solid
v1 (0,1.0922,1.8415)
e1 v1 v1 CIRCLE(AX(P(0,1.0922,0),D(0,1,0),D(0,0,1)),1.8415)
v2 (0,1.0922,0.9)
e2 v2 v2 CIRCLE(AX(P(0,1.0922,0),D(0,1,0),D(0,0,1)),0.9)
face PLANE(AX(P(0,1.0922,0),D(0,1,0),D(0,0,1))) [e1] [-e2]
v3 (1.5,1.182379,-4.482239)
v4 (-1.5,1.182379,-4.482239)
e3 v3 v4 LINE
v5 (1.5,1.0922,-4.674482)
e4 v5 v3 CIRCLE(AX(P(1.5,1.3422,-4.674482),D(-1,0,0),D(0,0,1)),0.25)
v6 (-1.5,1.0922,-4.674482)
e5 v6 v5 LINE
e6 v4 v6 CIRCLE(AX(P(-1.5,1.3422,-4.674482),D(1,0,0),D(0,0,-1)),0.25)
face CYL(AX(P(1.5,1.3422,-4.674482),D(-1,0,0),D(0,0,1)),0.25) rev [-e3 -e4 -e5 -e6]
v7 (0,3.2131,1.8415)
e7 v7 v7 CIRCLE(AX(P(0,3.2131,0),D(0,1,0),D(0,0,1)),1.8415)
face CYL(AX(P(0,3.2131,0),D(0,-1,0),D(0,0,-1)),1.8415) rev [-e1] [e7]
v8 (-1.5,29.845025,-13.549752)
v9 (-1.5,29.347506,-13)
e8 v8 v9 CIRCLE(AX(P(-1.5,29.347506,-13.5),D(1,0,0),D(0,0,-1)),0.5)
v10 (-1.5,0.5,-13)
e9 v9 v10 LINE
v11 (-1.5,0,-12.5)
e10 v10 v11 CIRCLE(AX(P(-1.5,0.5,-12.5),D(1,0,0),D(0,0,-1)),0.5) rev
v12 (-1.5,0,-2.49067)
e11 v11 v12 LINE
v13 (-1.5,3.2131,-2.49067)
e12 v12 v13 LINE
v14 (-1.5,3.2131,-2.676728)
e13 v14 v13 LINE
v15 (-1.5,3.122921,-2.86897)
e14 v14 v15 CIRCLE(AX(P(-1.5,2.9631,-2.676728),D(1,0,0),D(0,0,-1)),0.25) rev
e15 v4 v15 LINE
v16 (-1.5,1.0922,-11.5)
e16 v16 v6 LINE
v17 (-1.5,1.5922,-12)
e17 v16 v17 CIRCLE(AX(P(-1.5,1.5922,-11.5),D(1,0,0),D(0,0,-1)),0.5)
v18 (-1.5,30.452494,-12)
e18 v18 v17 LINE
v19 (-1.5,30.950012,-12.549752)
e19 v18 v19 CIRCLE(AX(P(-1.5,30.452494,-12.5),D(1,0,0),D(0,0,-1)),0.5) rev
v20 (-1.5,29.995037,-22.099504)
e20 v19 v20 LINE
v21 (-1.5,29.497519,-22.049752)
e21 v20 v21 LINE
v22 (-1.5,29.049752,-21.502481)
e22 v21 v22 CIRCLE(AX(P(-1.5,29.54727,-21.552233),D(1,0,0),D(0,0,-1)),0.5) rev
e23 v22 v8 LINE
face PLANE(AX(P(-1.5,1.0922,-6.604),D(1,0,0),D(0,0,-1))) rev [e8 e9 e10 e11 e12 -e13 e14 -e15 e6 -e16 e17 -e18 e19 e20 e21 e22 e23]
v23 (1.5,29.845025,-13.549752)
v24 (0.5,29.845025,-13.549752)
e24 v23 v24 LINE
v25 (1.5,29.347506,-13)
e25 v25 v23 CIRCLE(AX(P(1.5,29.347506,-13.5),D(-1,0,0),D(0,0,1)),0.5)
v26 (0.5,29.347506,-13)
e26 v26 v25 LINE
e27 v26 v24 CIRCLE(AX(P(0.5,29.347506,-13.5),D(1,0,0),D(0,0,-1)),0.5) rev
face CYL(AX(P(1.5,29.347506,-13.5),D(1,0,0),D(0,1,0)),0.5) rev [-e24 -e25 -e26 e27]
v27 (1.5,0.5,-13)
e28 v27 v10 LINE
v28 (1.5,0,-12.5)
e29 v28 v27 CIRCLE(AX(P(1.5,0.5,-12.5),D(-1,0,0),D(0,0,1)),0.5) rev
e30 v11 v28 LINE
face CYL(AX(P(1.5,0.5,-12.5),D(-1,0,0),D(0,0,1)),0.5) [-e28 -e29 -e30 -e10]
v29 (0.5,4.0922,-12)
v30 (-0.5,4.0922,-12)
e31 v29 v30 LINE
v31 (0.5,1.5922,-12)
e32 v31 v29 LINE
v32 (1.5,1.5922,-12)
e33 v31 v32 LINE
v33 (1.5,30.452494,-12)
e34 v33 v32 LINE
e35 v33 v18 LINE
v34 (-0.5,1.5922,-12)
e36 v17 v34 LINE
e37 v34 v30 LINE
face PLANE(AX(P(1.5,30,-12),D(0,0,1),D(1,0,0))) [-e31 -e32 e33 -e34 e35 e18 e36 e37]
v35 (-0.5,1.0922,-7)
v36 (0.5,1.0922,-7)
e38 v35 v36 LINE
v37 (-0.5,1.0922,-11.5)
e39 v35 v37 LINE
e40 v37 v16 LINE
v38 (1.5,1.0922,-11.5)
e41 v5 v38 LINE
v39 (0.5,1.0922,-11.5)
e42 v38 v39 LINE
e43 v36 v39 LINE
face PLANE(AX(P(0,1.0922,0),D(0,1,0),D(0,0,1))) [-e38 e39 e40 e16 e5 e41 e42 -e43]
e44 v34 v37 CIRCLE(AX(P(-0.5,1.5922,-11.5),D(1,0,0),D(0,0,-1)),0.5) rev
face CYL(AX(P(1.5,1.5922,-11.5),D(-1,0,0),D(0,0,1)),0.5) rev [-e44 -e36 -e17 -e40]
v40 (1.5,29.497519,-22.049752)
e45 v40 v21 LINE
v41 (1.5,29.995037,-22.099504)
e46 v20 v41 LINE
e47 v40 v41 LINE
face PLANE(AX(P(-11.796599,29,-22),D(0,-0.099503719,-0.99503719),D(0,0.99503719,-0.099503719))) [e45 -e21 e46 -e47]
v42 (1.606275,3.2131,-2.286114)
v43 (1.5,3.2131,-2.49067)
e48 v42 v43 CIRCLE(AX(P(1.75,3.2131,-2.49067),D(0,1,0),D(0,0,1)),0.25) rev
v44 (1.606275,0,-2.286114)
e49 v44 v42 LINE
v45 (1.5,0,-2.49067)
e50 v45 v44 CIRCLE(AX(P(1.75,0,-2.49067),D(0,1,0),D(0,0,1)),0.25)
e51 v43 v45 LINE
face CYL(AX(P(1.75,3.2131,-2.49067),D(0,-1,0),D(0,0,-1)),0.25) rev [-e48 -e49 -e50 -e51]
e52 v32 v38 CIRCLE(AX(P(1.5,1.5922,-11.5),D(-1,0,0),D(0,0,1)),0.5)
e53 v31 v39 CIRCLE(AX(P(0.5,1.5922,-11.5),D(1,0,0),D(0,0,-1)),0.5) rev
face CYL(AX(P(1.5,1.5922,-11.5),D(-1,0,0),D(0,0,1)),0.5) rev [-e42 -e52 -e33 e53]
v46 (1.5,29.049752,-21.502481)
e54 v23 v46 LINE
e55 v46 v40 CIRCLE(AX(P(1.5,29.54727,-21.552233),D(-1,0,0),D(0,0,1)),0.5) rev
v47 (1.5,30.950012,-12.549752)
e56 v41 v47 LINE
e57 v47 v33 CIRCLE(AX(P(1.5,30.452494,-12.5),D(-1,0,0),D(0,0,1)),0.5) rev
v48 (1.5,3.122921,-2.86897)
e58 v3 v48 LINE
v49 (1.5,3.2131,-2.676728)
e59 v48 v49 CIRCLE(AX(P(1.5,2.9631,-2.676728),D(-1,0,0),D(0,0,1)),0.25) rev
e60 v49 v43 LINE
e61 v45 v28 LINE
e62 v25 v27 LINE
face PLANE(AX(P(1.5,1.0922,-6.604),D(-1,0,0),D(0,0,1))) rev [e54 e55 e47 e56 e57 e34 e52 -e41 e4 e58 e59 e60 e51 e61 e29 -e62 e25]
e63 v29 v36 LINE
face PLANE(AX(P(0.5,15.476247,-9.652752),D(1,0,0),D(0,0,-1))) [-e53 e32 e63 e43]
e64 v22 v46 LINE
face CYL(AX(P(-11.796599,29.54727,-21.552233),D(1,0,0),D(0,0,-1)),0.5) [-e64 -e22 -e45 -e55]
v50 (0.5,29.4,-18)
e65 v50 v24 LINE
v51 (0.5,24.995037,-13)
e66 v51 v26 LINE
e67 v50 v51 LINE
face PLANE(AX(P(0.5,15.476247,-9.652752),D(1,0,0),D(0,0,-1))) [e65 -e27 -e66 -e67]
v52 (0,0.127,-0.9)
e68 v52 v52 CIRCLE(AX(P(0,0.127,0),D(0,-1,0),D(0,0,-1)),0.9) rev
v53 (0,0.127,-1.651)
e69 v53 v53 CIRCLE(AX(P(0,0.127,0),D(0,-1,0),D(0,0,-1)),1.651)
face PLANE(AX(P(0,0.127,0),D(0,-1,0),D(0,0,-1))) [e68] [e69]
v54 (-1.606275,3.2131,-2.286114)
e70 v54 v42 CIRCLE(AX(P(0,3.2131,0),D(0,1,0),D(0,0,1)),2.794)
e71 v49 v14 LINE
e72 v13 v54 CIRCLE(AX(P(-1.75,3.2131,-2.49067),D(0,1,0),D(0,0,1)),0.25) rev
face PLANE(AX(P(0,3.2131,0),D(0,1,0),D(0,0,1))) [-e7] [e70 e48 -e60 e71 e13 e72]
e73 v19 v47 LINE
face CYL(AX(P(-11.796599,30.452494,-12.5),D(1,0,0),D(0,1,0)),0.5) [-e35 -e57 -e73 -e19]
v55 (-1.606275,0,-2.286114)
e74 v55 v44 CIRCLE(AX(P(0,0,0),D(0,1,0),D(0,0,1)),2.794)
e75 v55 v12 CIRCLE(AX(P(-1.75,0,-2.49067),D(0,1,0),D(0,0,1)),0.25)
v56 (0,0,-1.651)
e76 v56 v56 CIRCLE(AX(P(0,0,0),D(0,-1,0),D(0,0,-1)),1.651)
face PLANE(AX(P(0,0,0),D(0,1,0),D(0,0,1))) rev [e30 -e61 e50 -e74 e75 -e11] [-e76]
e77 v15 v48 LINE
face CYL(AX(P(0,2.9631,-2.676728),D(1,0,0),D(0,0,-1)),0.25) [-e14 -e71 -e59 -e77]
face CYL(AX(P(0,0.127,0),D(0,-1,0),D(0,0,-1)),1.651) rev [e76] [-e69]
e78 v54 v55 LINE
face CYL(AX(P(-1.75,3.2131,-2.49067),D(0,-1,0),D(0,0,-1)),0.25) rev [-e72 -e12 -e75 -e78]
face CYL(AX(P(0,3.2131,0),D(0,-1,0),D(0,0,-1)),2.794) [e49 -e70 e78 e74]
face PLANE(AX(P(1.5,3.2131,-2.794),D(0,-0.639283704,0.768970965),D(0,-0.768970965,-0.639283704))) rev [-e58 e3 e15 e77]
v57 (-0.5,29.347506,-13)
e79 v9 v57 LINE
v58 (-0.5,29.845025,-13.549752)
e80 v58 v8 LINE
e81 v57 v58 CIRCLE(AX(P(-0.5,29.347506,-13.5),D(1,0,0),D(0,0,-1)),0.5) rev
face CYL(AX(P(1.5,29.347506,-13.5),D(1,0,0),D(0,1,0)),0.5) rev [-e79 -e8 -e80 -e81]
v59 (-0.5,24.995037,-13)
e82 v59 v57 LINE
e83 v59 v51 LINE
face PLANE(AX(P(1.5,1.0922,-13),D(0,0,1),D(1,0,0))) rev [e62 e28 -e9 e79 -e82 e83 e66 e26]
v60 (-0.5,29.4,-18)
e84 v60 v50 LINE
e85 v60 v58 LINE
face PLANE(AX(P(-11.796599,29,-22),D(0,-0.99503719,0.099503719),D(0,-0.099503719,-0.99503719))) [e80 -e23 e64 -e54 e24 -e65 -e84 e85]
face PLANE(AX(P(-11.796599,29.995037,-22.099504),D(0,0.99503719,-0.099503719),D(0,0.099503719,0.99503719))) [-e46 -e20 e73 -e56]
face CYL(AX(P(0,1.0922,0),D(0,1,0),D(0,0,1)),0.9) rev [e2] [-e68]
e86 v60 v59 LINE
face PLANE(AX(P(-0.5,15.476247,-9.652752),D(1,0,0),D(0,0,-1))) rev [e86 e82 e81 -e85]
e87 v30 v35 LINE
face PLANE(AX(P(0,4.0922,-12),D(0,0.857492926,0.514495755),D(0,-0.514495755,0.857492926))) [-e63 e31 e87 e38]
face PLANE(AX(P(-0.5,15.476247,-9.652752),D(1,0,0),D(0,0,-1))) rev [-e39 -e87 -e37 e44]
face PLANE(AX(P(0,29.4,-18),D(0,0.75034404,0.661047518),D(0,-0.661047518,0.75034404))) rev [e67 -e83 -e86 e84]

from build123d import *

# Parameters (mm, degrees)
SKETCH1_R                  = 2.794
SKETCH1_R_2                = 1.8415
BOSS_EXTRUDE1_DEPTH        = 3.2131
BOSS_EXTRUDE2_DEPTH        = 1.0922
M1_6_CLEARANCE_HOLE1_D     = 1.8
M1_6_CLEARANCE_HOLE1_DEPTH = 7.25
M1_6_CLEARANCE_HOLE1_TIP   = 0.540774557
SKETCH4_R                  = 1.651
CUT_EXTRUDE2_DEPTH         = 0.127
SKETCH5_W                  = 3
SKETCH5_H                  = 1
BOSS_EXTRUDE3_DEPTH        = 30
BOSS_EXTRUDE4_DEPTH        = 3
FILLET1_R                  = 0.5
RIB1_START                 = -0.5
RIB1_DEPTH                 = 1
RIB3_START                 = -0.5
RIB3_DEPTH                 = 1
BOSS_EXTRUDE8_DEPTH        = 1.5
FILLET2_R                  = 0.25


# Read off the part's stored shape, not the designer's step: Rib1, Rib3
with BuildPart() as part:
    # Sketch1 → Boss-Extrude1 (new body)
    with BuildSketch(Plane(origin=(0, 0, 0), x_dir=(1, 0, 0), z_dir=(0, 1, 0))):
        with Locations(Location((0, 0, 0), (0, 0, 270))):
            Circle(SKETCH1_R)
        with Locations(Location((0, 0, 0), (0, 0, 270))):
            Circle(SKETCH1_R_2, mode=Mode.SUBTRACT)
    extrude(amount=BOSS_EXTRUDE1_DEPTH)

    # Sketch2 → Boss-Extrude2 (add)
    with BuildSketch(Plane(origin=(0, 0, 0), x_dir=(1, 0, 0), z_dir=(0, 1, 0))):
        with BuildLine():
            Line((-1.5, 6.604), (-1.5, 2.357209367))
            ThreePointArc((-1.5, 2.357209367), (0, -2.794), (1.5, 2.357209367))
            Line((1.5, 2.357209367), (1.5, 6.604))
            Line((1.5, 6.604), (1.5, 13))
            Line((1.5, 13), (-1.5, 13))
            Line((-1.5, 13), (-1.5, 6.604))
        make_face()
    extrude(amount=BOSS_EXTRUDE2_DEPTH)

    # M1.6 Clearance Hole1
    with Locations(Plane(origin=(0, 1.0922, 0), x_dir=(1, 0, 0), z_dir=(0, 1, 0))):
        with Locations((0, 0)):
            Hole(M1_6_CLEARANCE_HOLE1_D / 2, depth=M1_6_CLEARANCE_HOLE1_DEPTH)
            with Locations((0, 0, -(M1_6_CLEARANCE_HOLE1_DEPTH + M1_6_CLEARANCE_HOLE1_TIP / 2))):  # 118° drill point
                Cone(0, M1_6_CLEARANCE_HOLE1_D / 2, M1_6_CLEARANCE_HOLE1_TIP, mode=Mode.SUBTRACT)

    # Sketch4 → Cut-Extrude2 (cut)
    with BuildSketch(Plane.XZ):
        with Locations(Location((0, 0, 0), (0, 0, 270))):
            Circle(SKETCH4_R)
    extrude(amount=-CUT_EXTRUDE2_DEPTH, mode=Mode.SUBTRACT)

    # Sketch5 → Boss-Extrude3 (add)
    with BuildSketch(Plane.XZ):
        with Locations((0, -12.5)):
            Rectangle(SKETCH5_W, SKETCH5_H)
    extrude(amount=-BOSS_EXTRUDE3_DEPTH)

    # Sketch6 → Boss-Extrude4 (add)
    with BuildSketch(Plane(origin=(1.5, 0, 0), x_dir=(0, 0, -1), z_dir=(1, 0, 0))):
        Polygon((22, 29), (12, 30), (12, 31.004987562), (22.099503719, 29.99503719), align=None)
    extrude(amount=-BOSS_EXTRUDE4_DEPTH)

    # Fillet1
    fillet1_edges = [part.edges().sort_by_distance(p)[0] for p in [
        (0, 0, -13),
        (0, 1.0922, -12),
        (0, 29, -22),
        (0, 31.004987562, -12),
        (0, 29.9, -13),
    ]]
    fillet(fillet1_edges, radius=FILLET1_R)

    # Rib1 outline → Rib1 (add)
    with BuildSketch(Plane(origin=(0, 0, 0), x_dir=(0, 0, -1), z_dir=(1, 0, 0)).offset(RIB1_START)):
        with BuildLine():
            Line((12, 1.5922), (12, 4.0922))
            Line((12, 4.0922), (7, 1.0922))
            Line((7, 1.0922), (11.5, 1.0922))
            ThreePointArc((11.5, 1.0922), (11.853553391, 1.238646609), (12, 1.5922))
        make_face()
    extrude(amount=RIB1_DEPTH)

    # Rib3 outline → Rib3 (add)
    with BuildSketch(Plane(origin=(0, 0, 0), x_dir=(0, 0, -1), z_dir=(1, 0, 0)).offset(RIB3_START)):
        with BuildLine():
            Line((13, 24.99503719), (18, 29.4))
            Line((18, 29.4), (13.54975186, 29.845024814))
            ThreePointArc((13.54975186, 29.845024814), (13.16449734, 29.718232486), (13, 29.347506219))
            Line((13, 29.347506219), (13, 24.99503719))
        make_face()
    extrude(amount=RIB3_DEPTH)

    # Sketch11 → Boss-Extrude8 (add, symmetric)
    with BuildSketch(Plane(origin=(0, 0, 0), x_dir=(0, 0, -1), z_dir=(1, 0, 0))):
        Polygon((2.357209367, 1.0922), (4.557209367, 1.0922), (2.794, 3.2131), (2.357209367, 3.2131), align=None)
    extrude(amount=BOSS_EXTRUDE8_DEPTH, both=True)

    # Fillet2
    fillet2_edges = [part.edges().sort_by_distance(p)[0] for p in [
        (-1.5, 1.60655, -2.357209367),
        (1.5, 1.60655, -2.357209367),
        (0, 3.2131, -2.794),
        (0, 1.0922, -4.557209367),
    ]]
    fillet(fillet2_edges, radius=FILLET2_R)


solid = part.part
